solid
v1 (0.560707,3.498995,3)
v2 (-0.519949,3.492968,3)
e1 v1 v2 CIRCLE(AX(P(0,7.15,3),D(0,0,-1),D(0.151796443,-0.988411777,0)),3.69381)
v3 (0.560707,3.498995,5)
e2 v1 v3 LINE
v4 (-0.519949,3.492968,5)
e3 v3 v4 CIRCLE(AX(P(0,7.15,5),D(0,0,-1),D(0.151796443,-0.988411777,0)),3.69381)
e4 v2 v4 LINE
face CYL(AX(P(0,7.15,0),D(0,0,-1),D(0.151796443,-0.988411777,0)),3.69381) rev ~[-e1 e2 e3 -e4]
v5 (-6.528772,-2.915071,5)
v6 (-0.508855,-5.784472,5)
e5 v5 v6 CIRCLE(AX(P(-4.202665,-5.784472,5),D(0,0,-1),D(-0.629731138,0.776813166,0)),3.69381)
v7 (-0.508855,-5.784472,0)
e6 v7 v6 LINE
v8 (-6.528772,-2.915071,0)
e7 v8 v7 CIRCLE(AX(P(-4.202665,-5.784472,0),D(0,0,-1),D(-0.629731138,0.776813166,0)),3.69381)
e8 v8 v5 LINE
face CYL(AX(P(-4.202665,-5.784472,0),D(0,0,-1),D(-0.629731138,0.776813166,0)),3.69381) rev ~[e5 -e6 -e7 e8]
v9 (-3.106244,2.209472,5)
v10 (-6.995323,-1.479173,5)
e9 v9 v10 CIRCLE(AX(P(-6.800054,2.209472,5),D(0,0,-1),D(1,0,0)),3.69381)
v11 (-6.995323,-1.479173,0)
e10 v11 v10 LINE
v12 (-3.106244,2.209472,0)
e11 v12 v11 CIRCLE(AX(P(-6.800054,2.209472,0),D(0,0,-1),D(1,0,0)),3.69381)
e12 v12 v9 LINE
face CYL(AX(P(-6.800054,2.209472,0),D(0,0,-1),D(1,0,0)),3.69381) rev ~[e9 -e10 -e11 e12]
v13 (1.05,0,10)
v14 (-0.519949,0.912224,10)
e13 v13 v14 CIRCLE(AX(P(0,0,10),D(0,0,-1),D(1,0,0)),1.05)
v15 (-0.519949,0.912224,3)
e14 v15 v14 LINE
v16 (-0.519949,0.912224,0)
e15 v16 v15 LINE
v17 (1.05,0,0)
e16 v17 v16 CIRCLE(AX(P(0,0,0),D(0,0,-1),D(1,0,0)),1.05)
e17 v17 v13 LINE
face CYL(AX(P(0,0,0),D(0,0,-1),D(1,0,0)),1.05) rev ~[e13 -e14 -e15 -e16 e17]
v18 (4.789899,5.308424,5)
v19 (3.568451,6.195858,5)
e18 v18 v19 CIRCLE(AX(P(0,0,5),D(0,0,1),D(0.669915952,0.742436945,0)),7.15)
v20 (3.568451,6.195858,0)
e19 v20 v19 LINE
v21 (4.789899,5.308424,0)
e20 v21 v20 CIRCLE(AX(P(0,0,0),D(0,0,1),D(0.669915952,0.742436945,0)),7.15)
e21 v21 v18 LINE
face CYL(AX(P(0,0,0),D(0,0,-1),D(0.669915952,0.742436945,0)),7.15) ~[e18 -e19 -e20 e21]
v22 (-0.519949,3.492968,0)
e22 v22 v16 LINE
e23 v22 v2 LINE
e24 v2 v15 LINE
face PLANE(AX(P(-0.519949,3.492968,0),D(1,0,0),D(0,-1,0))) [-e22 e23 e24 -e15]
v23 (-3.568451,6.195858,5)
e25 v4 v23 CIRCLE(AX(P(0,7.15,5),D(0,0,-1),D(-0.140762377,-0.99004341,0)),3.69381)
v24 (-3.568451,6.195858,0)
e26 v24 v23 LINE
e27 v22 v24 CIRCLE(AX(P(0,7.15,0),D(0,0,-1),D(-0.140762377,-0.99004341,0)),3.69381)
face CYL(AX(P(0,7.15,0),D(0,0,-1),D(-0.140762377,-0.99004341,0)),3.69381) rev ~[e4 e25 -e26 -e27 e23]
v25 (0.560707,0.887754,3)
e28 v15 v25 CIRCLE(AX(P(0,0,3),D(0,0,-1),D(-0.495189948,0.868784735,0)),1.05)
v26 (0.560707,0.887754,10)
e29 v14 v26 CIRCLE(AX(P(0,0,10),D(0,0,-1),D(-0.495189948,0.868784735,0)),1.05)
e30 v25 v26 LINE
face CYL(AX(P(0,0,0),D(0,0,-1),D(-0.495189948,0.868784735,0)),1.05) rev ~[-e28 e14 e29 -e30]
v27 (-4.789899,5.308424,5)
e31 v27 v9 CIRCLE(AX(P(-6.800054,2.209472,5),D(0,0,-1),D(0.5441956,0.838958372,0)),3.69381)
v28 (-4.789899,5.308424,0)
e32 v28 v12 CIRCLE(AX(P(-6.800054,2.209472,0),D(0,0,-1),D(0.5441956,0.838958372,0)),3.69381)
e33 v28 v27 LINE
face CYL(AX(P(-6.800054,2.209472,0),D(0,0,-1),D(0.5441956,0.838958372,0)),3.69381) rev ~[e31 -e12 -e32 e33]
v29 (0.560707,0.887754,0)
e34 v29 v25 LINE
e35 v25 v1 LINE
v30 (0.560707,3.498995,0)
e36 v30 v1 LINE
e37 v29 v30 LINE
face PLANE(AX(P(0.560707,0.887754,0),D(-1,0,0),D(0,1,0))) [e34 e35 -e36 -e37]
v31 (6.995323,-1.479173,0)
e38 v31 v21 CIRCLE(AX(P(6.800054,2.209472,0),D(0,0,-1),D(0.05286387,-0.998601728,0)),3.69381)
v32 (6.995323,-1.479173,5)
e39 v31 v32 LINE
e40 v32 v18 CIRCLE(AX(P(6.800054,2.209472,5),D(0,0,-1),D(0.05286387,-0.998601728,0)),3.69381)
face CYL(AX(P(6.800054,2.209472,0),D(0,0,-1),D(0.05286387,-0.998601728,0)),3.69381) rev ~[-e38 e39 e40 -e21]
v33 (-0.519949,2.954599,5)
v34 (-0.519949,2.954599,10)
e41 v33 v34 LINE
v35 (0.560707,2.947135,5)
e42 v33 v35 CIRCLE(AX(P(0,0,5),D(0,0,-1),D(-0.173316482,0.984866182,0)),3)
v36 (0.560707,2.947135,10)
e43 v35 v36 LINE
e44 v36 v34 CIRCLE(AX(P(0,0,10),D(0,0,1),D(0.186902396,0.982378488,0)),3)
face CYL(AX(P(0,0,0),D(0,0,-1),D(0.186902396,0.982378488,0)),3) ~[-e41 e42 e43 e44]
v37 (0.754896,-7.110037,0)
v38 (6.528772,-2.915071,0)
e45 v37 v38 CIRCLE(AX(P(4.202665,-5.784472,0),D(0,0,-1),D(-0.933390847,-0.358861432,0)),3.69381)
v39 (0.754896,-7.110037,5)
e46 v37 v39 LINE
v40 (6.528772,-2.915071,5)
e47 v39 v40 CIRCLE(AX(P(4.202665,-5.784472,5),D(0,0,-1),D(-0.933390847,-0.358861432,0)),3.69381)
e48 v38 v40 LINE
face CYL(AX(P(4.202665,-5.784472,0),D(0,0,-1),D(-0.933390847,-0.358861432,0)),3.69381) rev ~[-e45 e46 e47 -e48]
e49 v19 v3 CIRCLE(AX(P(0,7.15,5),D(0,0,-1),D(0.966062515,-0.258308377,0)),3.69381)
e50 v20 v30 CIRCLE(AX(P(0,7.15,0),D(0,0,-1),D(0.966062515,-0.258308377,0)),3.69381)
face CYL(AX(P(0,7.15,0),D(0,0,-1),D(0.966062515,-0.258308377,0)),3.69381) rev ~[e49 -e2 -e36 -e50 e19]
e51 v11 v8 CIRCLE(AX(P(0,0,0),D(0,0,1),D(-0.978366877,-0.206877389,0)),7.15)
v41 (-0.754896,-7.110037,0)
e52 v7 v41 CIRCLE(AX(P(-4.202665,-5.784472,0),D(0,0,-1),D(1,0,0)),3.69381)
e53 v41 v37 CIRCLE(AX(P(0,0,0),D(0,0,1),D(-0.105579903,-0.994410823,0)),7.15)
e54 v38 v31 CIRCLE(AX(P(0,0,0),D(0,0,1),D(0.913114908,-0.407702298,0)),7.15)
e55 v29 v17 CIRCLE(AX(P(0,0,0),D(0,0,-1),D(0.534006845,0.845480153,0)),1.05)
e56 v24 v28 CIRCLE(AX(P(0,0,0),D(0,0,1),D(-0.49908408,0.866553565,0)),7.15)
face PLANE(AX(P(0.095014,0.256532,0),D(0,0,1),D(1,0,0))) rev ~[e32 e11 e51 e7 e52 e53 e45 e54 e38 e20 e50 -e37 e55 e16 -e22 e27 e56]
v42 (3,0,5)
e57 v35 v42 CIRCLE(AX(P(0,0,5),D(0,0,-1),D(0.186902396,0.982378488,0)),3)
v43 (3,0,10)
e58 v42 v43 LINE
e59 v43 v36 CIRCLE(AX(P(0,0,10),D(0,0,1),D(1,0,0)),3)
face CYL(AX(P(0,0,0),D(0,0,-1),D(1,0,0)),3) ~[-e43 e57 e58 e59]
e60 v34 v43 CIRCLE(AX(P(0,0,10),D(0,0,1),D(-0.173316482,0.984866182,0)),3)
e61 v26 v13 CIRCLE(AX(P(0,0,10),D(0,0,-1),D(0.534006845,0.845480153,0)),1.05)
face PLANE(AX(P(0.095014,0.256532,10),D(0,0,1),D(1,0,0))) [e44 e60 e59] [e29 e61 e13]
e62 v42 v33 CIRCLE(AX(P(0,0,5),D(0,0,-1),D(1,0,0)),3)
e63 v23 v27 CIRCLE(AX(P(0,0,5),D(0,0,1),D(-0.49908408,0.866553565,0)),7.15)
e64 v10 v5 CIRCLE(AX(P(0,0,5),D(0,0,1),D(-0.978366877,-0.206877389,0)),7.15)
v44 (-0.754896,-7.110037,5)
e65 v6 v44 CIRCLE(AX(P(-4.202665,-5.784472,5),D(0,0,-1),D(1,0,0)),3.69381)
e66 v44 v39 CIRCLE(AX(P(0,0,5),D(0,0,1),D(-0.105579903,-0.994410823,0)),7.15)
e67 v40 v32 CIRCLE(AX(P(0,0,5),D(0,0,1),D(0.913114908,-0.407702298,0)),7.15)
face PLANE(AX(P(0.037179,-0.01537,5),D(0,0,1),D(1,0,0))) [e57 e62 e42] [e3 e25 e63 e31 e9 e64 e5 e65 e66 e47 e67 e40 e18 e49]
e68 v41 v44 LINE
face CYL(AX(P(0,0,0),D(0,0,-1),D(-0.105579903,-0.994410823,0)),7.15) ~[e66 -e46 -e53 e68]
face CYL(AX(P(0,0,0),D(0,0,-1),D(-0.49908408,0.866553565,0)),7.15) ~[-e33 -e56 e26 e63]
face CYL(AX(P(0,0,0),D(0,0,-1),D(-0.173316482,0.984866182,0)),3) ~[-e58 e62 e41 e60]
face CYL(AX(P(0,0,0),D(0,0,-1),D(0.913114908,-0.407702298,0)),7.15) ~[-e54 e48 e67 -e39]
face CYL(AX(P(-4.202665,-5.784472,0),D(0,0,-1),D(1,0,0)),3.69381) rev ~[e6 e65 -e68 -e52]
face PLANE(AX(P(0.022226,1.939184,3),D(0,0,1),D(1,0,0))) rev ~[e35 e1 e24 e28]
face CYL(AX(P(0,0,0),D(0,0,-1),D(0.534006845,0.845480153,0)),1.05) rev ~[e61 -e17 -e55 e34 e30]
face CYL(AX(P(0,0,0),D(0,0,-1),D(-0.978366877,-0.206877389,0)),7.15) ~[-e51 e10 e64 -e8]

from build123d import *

# Parameters (mm, degrees)
F1_DEPTH = 5
F2_DEPTH = 10
F3_DEPTH = 3


with BuildPart() as f1:
    # F0 (on Top) → F1 (new body)
    with BuildSketch(Plane.XY):
        with BuildLine():
            Line((0.560707187, 3.4989949035), (0.560707187, 2.9471354652))
            ThreePointArc((0.560707187, 2.9471354652), (2.3110735126, 1.9128353874), (3, 0))
            ThreePointArc((3, 0), (-1.9287498107, -2.2978085577), (-0.5199494453, 2.9545985471))
            Line((-0.5199494453, 2.9545985471), (-0.5199494453, 3.4929679604))
            ThreePointArc((-0.5199494453, 3.4929679604), (-2.4505424978, 4.3861128404), (-3.5684511747, 6.1958579885))
            ThreePointArc((-3.5684511747, 6.1958579885), (-4.2026645539, 5.7844715098), (-4.7898990575, 5.3084241559))
            ThreePointArc((-4.7898990575, 5.3084241559), (-3.5543368281, 3.9728631878), (-3.1062443016, 2.2094715098))
            ThreePointArc((-3.1062443016, 2.2094715098), (-4.2581115343, -0.4705954297), (-6.9953231706, -1.4791733296))
            ThreePointArc((-6.9953231706, -1.4791733296), (-6.8000540915, -2.2094715098), (-6.5287715949, -2.9150714334))
            ThreePointArc((-6.5287715949, -2.9150714334), (-2.6133197512, -2.450072934), (-0.508854764, -5.7844715098))
            ThreePointArc((-0.508854764, -5.7844715098), (-0.5708860042, -6.4585748626), (-0.754896307, -7.1100373814))
            ThreePointArc((-0.754896307, -7.1100373814), (0, -7.15), (0.754896307, -7.1100373814))
            ThreePointArc((0.754896307, -7.1100373814), (2.0314976346, -2.7961166157), (6.5287715949, -2.9150714334))
            ThreePointArc((6.5287715949, -2.9150714334), (6.8000540915, -2.2094715098), (6.9953231706, -1.4791733296))
            ThreePointArc((6.9953231706, -1.4791733296), (3.2870322209, 1.0680215107), (4.7898990575, 5.3084241559))
            ThreePointArc((4.7898990575, 5.3084241559), (4.2026645539, 5.7844715098), (3.5684511747, 6.1958579885))
            ThreePointArc((3.5684511747, 6.1958579885), (2.4659186562, 4.3998225611), (0.560707187, 3.4989949035))
        make_face()
        with BuildLine():
            ThreePointArc((-0.5199494453, 2.9545985471), (0.0207176923, 2.999928462), (0.560707187, 2.9471354652))
            Line((0.560707187, 2.9471354652), (0.560707187, 3.4989949035))
            ThreePointArc((0.560707187, 3.4989949035), (0.0206004706, 3.4562476552), (-0.5199494453, 3.4929679604))
            Line((-0.5199494453, 3.4929679604), (-0.5199494453, 2.9545985471))
        make_face()
    extrude(amount=F1_DEPTH)

    # F0 (on Top) → F2 (join)
    with BuildSketch(Plane.XY):
        with BuildLine():
            ThreePointArc((0.560707187, 0.887754161), (0.9195766815, 0.5068320499), (1.05, 0))
            ThreePointArc((1.05, 0), (-0.527519233, -0.9078675337), (-0.5199494453, 0.9122239716))
            Line((-0.5199494453, 0.9122239716), (-0.5199494453, 2.9545985471))
            ThreePointArc((-0.5199494453, 2.9545985471), (-1.9287498107, -2.2978085577), (3, 0))
            ThreePointArc((3, 0), (2.3110735126, 1.9128353874), (0.560707187, 2.9471354652))
            Line((0.560707187, 2.9471354652), (0.560707187, 0.887754161))
        make_face()
        with BuildLine():
            ThreePointArc((-0.5199494453, 0.9122239716), (0.0237695453, 1.0497309221), (0.560707187, 0.887754161))
            Line((0.560707187, 0.887754161), (0.560707187, 2.9471354652))
            ThreePointArc((0.560707187, 2.9471354652), (0.0207176923, 2.999928462), (-0.5199494453, 2.9545985471))
            Line((-0.5199494453, 2.9545985471), (-0.5199494453, 0.9122239716))
        make_face()
    extrude(amount=F2_DEPTH)

    # F0 (on Top) → F3 (cut)
    with BuildSketch(Plane.XY):
        with BuildLine():
            ThreePointArc((-0.5199494453, 0.9122239716), (0.0237695453, 1.0497309221), (0.560707187, 0.887754161))
            Line((0.560707187, 0.887754161), (0.560707187, 2.9471354652))
            ThreePointArc((0.560707187, 2.9471354652), (0.0207176923, 2.999928462), (-0.5199494453, 2.9545985471))
            Line((-0.5199494453, 2.9545985471), (-0.5199494453, 0.9122239716))
        make_face()
        with BuildLine():
            ThreePointArc((-0.5199494453, 2.9545985471), (0.0207176923, 2.999928462), (0.560707187, 2.9471354652))
            Line((0.560707187, 2.9471354652), (0.560707187, 3.4989949035))
            ThreePointArc((0.560707187, 3.4989949035), (0.0206004706, 3.4562476552), (-0.5199494453, 3.4929679604))
            Line((-0.5199494453, 3.4929679604), (-0.5199494453, 2.9545985471))
        make_face()
    extrude(amount=F3_DEPTH, mode=Mode.SUBTRACT)


solid = f1.part
